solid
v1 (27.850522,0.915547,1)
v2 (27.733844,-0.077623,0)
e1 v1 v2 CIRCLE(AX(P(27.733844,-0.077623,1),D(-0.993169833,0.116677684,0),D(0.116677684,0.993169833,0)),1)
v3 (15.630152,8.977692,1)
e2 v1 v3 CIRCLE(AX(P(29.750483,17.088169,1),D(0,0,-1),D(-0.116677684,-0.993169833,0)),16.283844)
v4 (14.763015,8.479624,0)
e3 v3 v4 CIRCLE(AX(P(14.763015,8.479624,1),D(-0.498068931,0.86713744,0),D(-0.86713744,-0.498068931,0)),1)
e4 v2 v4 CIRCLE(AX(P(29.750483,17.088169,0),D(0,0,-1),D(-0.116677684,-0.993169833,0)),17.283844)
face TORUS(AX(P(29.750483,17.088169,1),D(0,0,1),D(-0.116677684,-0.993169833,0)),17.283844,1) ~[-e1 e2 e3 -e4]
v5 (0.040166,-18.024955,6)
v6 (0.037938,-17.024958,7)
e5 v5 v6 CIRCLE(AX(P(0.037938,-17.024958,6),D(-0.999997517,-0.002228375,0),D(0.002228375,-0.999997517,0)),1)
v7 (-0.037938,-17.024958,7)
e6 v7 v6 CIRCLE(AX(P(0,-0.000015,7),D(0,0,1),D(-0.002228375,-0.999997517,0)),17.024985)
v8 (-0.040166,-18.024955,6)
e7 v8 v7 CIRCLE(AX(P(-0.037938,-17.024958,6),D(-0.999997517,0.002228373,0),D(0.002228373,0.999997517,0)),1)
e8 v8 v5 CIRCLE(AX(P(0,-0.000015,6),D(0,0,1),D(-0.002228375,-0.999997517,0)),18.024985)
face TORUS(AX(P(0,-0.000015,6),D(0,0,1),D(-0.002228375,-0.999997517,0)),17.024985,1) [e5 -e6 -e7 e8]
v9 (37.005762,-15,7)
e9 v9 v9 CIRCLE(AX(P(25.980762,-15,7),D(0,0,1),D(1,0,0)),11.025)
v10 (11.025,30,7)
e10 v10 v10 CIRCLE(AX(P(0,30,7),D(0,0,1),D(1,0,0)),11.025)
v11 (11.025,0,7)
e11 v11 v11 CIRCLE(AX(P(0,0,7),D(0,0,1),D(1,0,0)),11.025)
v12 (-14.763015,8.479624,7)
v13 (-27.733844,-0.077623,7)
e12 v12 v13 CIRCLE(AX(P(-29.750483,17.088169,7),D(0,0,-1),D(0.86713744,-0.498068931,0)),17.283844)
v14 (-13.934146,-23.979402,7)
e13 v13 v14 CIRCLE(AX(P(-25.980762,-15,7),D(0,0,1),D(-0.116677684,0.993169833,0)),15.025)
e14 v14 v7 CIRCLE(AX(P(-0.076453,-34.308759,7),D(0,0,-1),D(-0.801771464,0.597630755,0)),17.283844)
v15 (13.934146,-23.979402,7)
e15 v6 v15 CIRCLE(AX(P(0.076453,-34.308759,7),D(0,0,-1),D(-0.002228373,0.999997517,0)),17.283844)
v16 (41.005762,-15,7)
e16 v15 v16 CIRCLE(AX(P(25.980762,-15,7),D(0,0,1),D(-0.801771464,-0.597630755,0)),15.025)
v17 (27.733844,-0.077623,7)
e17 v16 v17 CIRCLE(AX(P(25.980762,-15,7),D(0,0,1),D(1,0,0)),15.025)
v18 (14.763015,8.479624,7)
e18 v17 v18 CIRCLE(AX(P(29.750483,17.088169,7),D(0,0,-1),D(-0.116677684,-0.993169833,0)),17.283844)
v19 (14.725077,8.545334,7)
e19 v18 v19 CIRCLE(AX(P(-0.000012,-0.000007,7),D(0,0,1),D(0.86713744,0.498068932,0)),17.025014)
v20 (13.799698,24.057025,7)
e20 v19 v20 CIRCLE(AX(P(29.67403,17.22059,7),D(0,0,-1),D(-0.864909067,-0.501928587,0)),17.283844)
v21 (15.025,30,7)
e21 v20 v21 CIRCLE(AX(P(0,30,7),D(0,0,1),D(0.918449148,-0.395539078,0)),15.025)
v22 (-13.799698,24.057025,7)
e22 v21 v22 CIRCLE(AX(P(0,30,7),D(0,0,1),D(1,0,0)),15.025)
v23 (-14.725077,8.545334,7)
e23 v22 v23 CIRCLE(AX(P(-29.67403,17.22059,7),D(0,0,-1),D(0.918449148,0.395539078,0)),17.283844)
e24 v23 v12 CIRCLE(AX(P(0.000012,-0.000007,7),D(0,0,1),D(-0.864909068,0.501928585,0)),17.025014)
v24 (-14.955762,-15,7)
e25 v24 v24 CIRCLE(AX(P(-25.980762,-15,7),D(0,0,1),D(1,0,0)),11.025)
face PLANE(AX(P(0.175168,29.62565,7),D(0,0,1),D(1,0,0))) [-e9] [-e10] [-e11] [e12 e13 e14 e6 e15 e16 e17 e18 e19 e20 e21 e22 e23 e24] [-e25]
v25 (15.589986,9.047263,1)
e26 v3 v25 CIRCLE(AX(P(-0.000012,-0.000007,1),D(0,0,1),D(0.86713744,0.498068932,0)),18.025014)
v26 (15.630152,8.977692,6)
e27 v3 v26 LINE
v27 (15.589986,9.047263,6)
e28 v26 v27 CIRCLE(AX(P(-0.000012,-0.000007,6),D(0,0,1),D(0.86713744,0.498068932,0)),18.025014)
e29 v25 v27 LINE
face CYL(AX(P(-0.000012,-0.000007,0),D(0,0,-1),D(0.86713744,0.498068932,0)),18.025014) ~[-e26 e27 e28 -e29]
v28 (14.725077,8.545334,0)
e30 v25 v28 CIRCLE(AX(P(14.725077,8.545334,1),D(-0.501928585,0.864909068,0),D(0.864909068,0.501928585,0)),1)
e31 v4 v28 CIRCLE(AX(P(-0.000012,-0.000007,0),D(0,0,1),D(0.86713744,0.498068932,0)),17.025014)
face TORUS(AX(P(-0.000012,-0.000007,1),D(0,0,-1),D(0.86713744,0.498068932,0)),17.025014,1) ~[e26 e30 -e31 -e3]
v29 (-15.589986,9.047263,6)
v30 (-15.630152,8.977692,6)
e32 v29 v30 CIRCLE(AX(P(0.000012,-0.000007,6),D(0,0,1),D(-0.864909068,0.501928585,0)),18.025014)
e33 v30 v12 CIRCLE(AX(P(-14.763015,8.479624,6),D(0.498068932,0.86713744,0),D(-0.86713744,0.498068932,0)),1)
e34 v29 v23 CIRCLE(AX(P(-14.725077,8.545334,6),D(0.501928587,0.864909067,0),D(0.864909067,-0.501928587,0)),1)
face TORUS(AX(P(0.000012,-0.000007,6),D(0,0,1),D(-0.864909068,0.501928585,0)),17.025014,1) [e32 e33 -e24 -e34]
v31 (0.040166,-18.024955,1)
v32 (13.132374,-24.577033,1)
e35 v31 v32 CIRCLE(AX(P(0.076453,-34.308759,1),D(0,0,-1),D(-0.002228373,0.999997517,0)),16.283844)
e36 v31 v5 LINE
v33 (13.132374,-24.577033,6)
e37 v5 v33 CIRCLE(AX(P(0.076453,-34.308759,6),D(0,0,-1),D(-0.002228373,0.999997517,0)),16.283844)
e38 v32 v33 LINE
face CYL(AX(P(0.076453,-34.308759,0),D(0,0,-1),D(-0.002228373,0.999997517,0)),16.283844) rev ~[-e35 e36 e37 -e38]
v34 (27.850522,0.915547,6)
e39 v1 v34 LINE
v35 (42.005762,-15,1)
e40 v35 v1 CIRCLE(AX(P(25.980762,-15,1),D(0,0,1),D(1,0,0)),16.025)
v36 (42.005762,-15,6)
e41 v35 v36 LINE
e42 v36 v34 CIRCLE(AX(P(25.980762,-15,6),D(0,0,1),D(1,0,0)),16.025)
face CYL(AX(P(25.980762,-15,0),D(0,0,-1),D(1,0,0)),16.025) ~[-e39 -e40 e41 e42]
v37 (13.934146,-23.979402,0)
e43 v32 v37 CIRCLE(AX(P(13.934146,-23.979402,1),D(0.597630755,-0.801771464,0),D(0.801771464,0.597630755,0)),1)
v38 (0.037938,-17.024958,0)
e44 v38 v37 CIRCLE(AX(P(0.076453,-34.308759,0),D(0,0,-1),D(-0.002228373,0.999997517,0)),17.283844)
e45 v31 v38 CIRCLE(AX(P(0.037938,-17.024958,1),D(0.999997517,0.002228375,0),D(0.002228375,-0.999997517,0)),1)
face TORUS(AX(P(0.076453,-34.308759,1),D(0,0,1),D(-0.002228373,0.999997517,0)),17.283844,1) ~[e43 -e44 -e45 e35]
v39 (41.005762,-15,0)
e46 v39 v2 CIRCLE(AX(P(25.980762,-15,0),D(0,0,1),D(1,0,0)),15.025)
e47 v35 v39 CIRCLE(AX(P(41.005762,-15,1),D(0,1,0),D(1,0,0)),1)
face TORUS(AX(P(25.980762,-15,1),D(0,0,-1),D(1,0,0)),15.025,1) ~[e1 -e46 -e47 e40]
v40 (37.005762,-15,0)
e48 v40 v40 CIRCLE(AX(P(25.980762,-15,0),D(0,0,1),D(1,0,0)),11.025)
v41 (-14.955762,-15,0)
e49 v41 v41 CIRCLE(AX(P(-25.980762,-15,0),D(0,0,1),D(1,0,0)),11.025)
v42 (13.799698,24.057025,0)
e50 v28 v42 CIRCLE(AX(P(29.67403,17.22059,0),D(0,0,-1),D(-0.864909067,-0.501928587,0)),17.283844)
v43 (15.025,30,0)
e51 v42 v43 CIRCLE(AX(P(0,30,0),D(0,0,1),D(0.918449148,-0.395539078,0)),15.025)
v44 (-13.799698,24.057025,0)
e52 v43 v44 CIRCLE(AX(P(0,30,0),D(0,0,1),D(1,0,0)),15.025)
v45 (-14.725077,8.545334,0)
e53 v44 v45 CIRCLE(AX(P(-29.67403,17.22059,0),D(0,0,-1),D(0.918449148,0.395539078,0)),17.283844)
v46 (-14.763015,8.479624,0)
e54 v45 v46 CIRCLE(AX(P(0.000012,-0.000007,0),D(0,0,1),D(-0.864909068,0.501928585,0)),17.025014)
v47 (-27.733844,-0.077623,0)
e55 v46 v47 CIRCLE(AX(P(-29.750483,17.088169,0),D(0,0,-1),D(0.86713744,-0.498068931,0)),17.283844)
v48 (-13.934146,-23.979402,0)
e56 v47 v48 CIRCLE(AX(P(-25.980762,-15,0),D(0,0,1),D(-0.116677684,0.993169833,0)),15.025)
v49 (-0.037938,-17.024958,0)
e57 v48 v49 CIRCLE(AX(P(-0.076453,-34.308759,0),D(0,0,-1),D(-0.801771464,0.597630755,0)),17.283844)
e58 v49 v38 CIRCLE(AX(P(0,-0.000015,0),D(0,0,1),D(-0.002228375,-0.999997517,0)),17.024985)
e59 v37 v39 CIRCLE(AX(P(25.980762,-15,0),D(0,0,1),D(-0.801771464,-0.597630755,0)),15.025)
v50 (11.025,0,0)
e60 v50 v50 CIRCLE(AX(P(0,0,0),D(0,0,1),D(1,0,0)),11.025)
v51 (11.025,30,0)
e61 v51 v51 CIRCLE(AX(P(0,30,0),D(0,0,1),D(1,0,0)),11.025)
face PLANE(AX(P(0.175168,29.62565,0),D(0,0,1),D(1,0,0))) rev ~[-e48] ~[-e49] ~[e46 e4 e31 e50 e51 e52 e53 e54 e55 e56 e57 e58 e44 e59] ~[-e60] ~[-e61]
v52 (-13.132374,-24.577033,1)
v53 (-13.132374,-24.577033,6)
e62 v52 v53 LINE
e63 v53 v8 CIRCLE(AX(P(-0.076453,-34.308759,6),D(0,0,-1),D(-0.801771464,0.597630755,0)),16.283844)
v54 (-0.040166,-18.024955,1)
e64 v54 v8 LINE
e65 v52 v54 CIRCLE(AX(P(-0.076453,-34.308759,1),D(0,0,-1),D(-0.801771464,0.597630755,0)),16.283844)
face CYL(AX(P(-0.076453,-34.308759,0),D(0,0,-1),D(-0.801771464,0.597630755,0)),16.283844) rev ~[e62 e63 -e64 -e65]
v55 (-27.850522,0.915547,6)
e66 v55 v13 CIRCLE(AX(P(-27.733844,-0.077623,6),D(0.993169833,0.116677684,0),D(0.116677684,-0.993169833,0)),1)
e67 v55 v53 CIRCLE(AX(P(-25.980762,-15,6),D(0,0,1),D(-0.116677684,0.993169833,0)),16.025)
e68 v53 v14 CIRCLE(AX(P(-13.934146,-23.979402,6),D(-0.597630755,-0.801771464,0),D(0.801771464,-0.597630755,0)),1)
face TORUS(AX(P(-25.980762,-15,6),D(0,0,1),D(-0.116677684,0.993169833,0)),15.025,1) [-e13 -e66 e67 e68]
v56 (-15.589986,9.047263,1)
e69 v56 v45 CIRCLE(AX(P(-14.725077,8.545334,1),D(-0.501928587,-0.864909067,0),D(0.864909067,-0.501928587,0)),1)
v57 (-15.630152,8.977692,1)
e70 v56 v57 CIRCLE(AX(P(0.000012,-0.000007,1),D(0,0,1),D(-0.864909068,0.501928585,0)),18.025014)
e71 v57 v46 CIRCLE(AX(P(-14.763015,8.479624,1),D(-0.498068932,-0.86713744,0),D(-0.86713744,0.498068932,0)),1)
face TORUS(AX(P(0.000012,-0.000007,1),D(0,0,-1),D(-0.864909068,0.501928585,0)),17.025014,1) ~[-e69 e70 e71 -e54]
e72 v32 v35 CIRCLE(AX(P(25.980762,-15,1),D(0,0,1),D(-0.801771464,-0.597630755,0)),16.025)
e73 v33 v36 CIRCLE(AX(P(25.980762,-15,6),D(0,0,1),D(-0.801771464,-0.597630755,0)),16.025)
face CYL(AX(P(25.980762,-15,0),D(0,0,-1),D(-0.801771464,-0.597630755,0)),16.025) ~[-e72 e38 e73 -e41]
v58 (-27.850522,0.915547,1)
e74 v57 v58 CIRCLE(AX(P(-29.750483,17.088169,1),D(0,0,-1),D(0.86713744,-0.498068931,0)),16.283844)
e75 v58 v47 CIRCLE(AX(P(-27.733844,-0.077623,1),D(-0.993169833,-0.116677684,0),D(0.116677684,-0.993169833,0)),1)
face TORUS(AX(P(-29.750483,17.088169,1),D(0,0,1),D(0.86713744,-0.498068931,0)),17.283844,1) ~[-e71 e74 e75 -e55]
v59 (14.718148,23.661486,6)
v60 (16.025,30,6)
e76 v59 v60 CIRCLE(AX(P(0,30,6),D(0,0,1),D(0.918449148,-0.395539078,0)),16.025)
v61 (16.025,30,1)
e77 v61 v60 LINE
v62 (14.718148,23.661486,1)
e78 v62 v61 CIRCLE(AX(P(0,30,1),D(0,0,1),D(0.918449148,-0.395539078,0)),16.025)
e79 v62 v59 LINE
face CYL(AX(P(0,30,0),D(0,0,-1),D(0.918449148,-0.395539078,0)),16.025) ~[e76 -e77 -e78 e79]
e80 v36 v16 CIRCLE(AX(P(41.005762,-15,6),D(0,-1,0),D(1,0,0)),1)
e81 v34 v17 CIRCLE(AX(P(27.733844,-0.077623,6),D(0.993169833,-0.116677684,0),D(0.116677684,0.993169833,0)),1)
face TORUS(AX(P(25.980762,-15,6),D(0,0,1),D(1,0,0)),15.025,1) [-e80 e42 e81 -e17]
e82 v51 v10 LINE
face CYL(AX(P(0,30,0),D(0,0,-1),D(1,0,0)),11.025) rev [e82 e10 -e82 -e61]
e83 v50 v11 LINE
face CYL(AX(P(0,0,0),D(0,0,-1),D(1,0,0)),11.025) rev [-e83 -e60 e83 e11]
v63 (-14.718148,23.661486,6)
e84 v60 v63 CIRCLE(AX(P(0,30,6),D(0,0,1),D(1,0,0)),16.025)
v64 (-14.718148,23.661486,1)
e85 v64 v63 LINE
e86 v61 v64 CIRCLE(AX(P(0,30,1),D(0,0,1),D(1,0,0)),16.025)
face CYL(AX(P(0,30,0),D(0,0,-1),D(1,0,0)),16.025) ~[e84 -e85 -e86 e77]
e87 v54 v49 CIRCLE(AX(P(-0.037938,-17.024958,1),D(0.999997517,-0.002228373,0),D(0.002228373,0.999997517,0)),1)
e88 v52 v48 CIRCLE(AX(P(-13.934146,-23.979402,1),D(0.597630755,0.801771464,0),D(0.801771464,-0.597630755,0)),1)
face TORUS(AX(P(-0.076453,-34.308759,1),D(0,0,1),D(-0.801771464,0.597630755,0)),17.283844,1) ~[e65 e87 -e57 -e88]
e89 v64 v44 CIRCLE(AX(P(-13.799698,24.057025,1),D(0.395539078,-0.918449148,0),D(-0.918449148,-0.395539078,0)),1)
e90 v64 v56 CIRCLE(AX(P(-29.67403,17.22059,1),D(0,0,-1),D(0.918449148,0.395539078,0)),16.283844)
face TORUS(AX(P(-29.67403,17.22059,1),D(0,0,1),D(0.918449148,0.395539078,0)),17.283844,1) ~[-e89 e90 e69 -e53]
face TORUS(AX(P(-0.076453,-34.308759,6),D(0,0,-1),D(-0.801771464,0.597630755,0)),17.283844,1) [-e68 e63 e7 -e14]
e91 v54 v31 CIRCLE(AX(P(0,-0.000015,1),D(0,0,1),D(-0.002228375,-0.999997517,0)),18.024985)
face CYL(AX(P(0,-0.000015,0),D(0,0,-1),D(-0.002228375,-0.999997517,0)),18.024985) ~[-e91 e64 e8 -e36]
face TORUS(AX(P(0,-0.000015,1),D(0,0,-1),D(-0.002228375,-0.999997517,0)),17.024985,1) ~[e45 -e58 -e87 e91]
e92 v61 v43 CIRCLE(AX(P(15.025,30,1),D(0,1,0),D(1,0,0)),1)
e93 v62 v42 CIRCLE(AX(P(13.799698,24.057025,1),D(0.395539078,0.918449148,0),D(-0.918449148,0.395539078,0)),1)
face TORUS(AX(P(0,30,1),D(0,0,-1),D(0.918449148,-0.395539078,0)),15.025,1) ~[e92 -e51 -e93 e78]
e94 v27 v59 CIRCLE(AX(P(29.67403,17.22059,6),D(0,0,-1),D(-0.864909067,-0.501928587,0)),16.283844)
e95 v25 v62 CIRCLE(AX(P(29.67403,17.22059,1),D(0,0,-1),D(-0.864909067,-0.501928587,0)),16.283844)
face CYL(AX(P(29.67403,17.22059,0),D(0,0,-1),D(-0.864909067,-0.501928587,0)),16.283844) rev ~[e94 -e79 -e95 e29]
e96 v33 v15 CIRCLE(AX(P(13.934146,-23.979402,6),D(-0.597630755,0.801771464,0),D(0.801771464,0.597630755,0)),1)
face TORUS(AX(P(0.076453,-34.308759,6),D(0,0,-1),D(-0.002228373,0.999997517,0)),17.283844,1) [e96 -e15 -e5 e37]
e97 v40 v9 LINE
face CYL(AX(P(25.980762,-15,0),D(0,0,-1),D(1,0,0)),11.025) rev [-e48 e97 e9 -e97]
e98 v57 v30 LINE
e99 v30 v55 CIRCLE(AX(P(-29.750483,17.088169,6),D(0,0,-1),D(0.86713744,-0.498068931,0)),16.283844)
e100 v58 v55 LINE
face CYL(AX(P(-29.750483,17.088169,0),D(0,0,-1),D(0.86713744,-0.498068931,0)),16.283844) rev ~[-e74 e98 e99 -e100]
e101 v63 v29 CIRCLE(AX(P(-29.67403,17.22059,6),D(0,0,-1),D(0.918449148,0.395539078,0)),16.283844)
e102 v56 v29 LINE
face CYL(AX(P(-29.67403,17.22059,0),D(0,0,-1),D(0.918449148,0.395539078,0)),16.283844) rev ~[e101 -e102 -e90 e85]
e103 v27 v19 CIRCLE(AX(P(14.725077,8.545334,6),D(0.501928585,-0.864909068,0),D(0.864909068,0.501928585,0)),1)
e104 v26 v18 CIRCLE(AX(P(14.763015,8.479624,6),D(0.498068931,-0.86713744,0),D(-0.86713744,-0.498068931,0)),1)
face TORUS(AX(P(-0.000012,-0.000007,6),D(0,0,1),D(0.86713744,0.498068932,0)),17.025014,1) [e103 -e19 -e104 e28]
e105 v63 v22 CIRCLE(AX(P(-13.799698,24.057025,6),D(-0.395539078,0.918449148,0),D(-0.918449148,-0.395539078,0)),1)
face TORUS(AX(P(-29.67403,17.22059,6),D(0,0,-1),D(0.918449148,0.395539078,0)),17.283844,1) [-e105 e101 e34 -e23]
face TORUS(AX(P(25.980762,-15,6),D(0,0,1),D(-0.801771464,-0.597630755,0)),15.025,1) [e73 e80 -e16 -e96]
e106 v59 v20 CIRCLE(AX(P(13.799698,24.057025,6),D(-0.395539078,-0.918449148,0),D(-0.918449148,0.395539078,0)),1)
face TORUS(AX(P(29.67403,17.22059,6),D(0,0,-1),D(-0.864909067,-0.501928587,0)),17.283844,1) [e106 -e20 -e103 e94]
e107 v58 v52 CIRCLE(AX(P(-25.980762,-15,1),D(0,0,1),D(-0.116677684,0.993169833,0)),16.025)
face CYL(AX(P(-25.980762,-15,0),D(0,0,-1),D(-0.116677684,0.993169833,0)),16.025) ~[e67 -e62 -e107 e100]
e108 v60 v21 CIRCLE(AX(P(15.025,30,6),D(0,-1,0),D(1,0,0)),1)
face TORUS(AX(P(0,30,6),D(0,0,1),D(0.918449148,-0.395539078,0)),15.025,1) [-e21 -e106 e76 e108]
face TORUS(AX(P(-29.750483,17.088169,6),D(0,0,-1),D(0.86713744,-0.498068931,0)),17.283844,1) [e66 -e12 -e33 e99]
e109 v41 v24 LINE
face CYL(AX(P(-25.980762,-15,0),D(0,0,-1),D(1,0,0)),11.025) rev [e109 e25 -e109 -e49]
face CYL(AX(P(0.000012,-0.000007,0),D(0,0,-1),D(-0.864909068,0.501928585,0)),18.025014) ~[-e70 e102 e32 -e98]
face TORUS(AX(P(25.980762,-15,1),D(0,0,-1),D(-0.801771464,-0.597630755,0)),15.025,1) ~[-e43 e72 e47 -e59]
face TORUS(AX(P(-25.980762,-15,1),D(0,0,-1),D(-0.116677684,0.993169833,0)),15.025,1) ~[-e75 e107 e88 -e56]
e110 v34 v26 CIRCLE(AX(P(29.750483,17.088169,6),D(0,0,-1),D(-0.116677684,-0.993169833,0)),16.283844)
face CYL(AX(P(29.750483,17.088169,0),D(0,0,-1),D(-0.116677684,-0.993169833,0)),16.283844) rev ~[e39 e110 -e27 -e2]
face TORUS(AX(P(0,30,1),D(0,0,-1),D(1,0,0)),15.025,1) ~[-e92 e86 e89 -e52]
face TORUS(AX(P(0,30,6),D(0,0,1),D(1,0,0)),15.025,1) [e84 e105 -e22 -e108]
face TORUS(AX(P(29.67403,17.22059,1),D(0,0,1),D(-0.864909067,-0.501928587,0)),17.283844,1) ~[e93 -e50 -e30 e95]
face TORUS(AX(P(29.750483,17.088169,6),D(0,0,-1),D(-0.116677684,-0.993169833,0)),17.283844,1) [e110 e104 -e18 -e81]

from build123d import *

# Parameters (mm, degrees)
F0_R     = 11.025
F1_DEPTH = 7
F2_R     = 1


with BuildPart() as f1:
    # F0 (on Top) → F1 (new body)
    with BuildSketch(Plane.XY):
        with BuildLine():
            ThreePointArc((14.7181475974, 23.6614862702), (15.6948867509, 26.7640836111), (16.025, 30))
            ThreePointArc((16.025, 30), (-3.2359163889, 45.6948867509), (-14.7181475974, 23.6614862702))
            ThreePointArc((-14.7181475974, 23.6614862702), (-11.9828737003, 19.359917158), (-8.0350731173, 16.135))
            ThreePointArc((-8.0350731173, 16.135), (0, 18.025), (8.0350731173, 16.135))
            ThreePointArc((8.0350731173, 16.135), (11.9828737003, 19.359917158), (14.7181475974, 23.6614862702))
        make_face()
        with Locations((0, 30)):
            Circle(F0_R, mode=Mode.SUBTRACT)
        with BuildLine():
            ThreePointArc((-8.0350731173, 16.135), (-11.9828737003, 19.359917158), (-14.7181475974, 23.6614862702))
            ThreePointArc((-14.7181475974, 23.6614862702), (-13.4190857224, 16.250871043), (-15.58998593, 9.0472627741))
            ThreePointArc((-15.58998593, 9.0472627741), (-12.3326744258, 13.1455607149), (-8.0350731173, 16.135))
        make_face()
        with BuildLine():
            ThreePointArc((15.58998593, 9.0472627741), (13.4190857224, 16.250871043), (14.7181475974, 23.6614862702))
            ThreePointArc((14.7181475974, 23.6614862702), (11.9828737003, 19.359917158), (8.0350731173, 16.135))
            ThreePointArc((8.0350731173, 16.135), (12.3326744258, 13.1455607149), (15.58998593, 9.0472627741))
        make_face()
        with BuildLine():
            ThreePointArc((8.0350731173, 16.135), (0, 13.975), (-8.0350731173, 16.135))
            ThreePointArc((-8.0350731173, 16.135), (-12.3326744258, 13.1455607149), (-15.58998593, 9.0472627741))
            ThreePointArc((-15.58998593, 9.0472627741), (-15.6101079032, 9.0125), (-15.6301523621, 8.9776924729))
            ThreePointArc((-15.6301523621, 8.9776924729), (-17.5507267389, 4.1076289919), (-17.9908564487, -1.1089225592))
            ThreePointArc((-17.9908564487, -1.1089225592), (-12.1092289741, -6.9762107854), (-9.9557621135, -15))
            ThreePointArc((-9.9557621135, -15), (-9.955767418, -15.0130387247), (-9.9557833314, -15.0260774408))
            ThreePointArc((-9.9557833314, -15.0260774408), (-5.2180523132, -17.2531897067), (-0.0401664321, -18.024955247))
            ThreePointArc((-0.0401664321, -18.024955247), (0, -18.025), (0.0401664321, -18.024955247))
            ThreePointArc((0.0401664321, -18.024955247), (5.2180523132, -17.2531897067), (9.9557833314, -15.0260774408))
            ThreePointArc((9.9557833314, -15.0260774408), (12.1027050179, -6.9875), (17.9908564487, -1.1089225592))
            ThreePointArc((17.9908564487, -1.1089225592), (18.0164620901, -0.554724036), (18.025, 0))
            ThreePointArc((18.025, 0), (17.4160001339, 4.6458114831), (15.6301523621, 8.9776924729))
            ThreePointArc((15.6301523621, 8.9776924729), (15.6101079032, 9.0125), (15.58998593, 9.0472627741))
            ThreePointArc((15.58998593, 9.0472627741), (12.3326744258, 13.1455607149), (8.0350731173, 16.135))
        make_face()
        Circle(F0_R, mode=Mode.SUBTRACT)
        with BuildLine():
            ThreePointArc((-17.9908564487, -1.1089225592), (-17.5507267389, 4.1076289919), (-15.6301523621, 8.9776924729))
            ThreePointArc((-15.6301523621, 8.9776924729), (-20.783210018, 3.4958336097), (-27.850522, 0.9155465808))
            ThreePointArc((-27.850522, 0.9155465808), (-22.7576169242, 0.6975144557), (-17.9908564487, -1.1089225592))
        make_face()
        with BuildLine():
            ThreePointArc((27.850522, 0.9155465808), (20.783210018, 3.4958336097), (15.6301523621, 8.9776924729))
            ThreePointArc((15.6301523621, 8.9776924729), (17.4160001339, 4.6458114831), (18.025, 0))
            ThreePointArc((18.025, 0), (18.0164620901, -0.554724036), (17.9908564487, -1.1089225592))
            ThreePointArc((17.9908564487, -1.1089225592), (22.7576169242, 0.6975144557), (27.850522, 0.9155465808))
        make_face()
        with BuildLine():
            ThreePointArc((-9.9557833314, -15.0260774408), (-15.6101079032, -9.0125), (-17.9908564487, -1.1089225592))
            ThreePointArc((-17.9908564487, -1.1089225592), (-22.7576169242, 0.6975144557), (-27.850522, 0.9155465808))
            ThreePointArc((-27.850522, 0.9155465808), (-39.8588192092, -23.0125), (-13.1323744027, -24.5770328511))
            ThreePointArc((-13.1323744027, -24.5770328511), (-10.7747432239, -20.0574316138), (-9.9557833314, -15.0260774408))
        make_face()
        with Locations((-25.9807621135, -15)):
            Circle(F0_R, mode=Mode.SUBTRACT)
        with BuildLine():
            ThreePointArc((42.0057621135, -15), (37.9549745549, -4.3501708272), (27.850522, 0.9155465808))
            ThreePointArc((27.850522, 0.9155465808), (22.7576169242, 0.6975144557), (17.9908564487, -1.1089225592))
            ThreePointArc((17.9908564487, -1.1089225592), (15.6101079032, -9.0125), (9.9557833314, -15.0260774408))
            ThreePointArc((9.9557833314, -15.0260774408), (10.7747432239, -20.0574316138), (13.1323744027, -24.5770328511))
            ThreePointArc((13.1323744027, -24.5770328511), (31.0258196917, -30.2101288303), (42.0057621135, -15))
        make_face()
        with Locations((25.9807621135, -15)):
            Circle(F0_R, mode=Mode.SUBTRACT)
        with BuildLine():
            ThreePointArc((-0.0401664321, -18.024955247), (-5.2180523132, -17.2531897067), (-9.9557833314, -15.0260774408))
            ThreePointArc((-9.9557833314, -15.0260774408), (-10.7747432239, -20.0574316138), (-13.1323744027, -24.5770328511))
            ThreePointArc((-13.1323744027, -24.5770328511), (-7.3641242956, -19.7467046526), (-0.0401664321, -18.024955247))
        make_face()
        with BuildLine():
            ThreePointArc((13.1323744027, -24.5770328511), (10.7747432239, -20.0574316138), (9.9557833314, -15.0260774408))
            ThreePointArc((9.9557833314, -15.0260774408), (5.2180523132, -17.2531897067), (0.0401664321, -18.024955247))
            ThreePointArc((0.0401664321, -18.024955247), (7.3641242956, -19.7467046526), (13.1323744027, -24.5770328511))
        make_face()
        with BuildLine():
            ThreePointArc((-9.9557621135, -15), (-12.1092289741, -6.9762107854), (-17.9908564487, -1.1089225592))
            ThreePointArc((-17.9908564487, -1.1089225592), (-15.6101079032, -9.0125), (-9.9557833314, -15.0260774408))
            ThreePointArc((-9.9557833314, -15.0260774408), (-9.955767418, -15.0130387247), (-9.9557621135, -15))
        make_face()
        with BuildLine():
            ThreePointArc((8.0350731173, 16.135), (0, 18.025), (-8.0350731173, 16.135))
            ThreePointArc((-8.0350731173, 16.135), (0, 13.975), (8.0350731173, 16.135))
        make_face()
        with BuildLine():
            ThreePointArc((9.9557833314, -15.0260774408), (15.6101079032, -9.0125), (17.9908564487, -1.1089225592))
            ThreePointArc((17.9908564487, -1.1089225592), (12.1027050179, -6.9875), (9.9557833314, -15.0260774408))
        make_face()
    extrude(amount=F1_DEPTH)

    # F2
    f2_edges = [f1.edges().sort_by_distance(p)[0] for p in [
        (14.718148, 23.661486, 3.5),
        (-14.718148, 23.661486, 3.5),
        (0, 46.025, 0),
        (0, 46.025, 7),
        (-15.589986, 9.047263, 3.5),
        (-13.419086, 16.250871, 0),
        (-13.419086, 16.250871, 7),
        (-15.630152, 8.977692, 3.5),
        (-27.850522, 0.915547, 3.5),
        (-20.78321, 3.495834, 0),
        (-20.78321, 3.495834, 7),
        (-13.132374, -24.577033, 3.5),
        (-39.858819, -23.0125, 0),
        (-39.858819, -23.0125, 7),
        (0.040166, -18.024955, 3.5),
        (13.132374, -24.577033, 3.5),
        (7.364124, -19.746705, 0),
        (7.364124, -19.746705, 7),
    ]]
    fillet(f2_edges, radius=F2_R)


solid = f1.part
